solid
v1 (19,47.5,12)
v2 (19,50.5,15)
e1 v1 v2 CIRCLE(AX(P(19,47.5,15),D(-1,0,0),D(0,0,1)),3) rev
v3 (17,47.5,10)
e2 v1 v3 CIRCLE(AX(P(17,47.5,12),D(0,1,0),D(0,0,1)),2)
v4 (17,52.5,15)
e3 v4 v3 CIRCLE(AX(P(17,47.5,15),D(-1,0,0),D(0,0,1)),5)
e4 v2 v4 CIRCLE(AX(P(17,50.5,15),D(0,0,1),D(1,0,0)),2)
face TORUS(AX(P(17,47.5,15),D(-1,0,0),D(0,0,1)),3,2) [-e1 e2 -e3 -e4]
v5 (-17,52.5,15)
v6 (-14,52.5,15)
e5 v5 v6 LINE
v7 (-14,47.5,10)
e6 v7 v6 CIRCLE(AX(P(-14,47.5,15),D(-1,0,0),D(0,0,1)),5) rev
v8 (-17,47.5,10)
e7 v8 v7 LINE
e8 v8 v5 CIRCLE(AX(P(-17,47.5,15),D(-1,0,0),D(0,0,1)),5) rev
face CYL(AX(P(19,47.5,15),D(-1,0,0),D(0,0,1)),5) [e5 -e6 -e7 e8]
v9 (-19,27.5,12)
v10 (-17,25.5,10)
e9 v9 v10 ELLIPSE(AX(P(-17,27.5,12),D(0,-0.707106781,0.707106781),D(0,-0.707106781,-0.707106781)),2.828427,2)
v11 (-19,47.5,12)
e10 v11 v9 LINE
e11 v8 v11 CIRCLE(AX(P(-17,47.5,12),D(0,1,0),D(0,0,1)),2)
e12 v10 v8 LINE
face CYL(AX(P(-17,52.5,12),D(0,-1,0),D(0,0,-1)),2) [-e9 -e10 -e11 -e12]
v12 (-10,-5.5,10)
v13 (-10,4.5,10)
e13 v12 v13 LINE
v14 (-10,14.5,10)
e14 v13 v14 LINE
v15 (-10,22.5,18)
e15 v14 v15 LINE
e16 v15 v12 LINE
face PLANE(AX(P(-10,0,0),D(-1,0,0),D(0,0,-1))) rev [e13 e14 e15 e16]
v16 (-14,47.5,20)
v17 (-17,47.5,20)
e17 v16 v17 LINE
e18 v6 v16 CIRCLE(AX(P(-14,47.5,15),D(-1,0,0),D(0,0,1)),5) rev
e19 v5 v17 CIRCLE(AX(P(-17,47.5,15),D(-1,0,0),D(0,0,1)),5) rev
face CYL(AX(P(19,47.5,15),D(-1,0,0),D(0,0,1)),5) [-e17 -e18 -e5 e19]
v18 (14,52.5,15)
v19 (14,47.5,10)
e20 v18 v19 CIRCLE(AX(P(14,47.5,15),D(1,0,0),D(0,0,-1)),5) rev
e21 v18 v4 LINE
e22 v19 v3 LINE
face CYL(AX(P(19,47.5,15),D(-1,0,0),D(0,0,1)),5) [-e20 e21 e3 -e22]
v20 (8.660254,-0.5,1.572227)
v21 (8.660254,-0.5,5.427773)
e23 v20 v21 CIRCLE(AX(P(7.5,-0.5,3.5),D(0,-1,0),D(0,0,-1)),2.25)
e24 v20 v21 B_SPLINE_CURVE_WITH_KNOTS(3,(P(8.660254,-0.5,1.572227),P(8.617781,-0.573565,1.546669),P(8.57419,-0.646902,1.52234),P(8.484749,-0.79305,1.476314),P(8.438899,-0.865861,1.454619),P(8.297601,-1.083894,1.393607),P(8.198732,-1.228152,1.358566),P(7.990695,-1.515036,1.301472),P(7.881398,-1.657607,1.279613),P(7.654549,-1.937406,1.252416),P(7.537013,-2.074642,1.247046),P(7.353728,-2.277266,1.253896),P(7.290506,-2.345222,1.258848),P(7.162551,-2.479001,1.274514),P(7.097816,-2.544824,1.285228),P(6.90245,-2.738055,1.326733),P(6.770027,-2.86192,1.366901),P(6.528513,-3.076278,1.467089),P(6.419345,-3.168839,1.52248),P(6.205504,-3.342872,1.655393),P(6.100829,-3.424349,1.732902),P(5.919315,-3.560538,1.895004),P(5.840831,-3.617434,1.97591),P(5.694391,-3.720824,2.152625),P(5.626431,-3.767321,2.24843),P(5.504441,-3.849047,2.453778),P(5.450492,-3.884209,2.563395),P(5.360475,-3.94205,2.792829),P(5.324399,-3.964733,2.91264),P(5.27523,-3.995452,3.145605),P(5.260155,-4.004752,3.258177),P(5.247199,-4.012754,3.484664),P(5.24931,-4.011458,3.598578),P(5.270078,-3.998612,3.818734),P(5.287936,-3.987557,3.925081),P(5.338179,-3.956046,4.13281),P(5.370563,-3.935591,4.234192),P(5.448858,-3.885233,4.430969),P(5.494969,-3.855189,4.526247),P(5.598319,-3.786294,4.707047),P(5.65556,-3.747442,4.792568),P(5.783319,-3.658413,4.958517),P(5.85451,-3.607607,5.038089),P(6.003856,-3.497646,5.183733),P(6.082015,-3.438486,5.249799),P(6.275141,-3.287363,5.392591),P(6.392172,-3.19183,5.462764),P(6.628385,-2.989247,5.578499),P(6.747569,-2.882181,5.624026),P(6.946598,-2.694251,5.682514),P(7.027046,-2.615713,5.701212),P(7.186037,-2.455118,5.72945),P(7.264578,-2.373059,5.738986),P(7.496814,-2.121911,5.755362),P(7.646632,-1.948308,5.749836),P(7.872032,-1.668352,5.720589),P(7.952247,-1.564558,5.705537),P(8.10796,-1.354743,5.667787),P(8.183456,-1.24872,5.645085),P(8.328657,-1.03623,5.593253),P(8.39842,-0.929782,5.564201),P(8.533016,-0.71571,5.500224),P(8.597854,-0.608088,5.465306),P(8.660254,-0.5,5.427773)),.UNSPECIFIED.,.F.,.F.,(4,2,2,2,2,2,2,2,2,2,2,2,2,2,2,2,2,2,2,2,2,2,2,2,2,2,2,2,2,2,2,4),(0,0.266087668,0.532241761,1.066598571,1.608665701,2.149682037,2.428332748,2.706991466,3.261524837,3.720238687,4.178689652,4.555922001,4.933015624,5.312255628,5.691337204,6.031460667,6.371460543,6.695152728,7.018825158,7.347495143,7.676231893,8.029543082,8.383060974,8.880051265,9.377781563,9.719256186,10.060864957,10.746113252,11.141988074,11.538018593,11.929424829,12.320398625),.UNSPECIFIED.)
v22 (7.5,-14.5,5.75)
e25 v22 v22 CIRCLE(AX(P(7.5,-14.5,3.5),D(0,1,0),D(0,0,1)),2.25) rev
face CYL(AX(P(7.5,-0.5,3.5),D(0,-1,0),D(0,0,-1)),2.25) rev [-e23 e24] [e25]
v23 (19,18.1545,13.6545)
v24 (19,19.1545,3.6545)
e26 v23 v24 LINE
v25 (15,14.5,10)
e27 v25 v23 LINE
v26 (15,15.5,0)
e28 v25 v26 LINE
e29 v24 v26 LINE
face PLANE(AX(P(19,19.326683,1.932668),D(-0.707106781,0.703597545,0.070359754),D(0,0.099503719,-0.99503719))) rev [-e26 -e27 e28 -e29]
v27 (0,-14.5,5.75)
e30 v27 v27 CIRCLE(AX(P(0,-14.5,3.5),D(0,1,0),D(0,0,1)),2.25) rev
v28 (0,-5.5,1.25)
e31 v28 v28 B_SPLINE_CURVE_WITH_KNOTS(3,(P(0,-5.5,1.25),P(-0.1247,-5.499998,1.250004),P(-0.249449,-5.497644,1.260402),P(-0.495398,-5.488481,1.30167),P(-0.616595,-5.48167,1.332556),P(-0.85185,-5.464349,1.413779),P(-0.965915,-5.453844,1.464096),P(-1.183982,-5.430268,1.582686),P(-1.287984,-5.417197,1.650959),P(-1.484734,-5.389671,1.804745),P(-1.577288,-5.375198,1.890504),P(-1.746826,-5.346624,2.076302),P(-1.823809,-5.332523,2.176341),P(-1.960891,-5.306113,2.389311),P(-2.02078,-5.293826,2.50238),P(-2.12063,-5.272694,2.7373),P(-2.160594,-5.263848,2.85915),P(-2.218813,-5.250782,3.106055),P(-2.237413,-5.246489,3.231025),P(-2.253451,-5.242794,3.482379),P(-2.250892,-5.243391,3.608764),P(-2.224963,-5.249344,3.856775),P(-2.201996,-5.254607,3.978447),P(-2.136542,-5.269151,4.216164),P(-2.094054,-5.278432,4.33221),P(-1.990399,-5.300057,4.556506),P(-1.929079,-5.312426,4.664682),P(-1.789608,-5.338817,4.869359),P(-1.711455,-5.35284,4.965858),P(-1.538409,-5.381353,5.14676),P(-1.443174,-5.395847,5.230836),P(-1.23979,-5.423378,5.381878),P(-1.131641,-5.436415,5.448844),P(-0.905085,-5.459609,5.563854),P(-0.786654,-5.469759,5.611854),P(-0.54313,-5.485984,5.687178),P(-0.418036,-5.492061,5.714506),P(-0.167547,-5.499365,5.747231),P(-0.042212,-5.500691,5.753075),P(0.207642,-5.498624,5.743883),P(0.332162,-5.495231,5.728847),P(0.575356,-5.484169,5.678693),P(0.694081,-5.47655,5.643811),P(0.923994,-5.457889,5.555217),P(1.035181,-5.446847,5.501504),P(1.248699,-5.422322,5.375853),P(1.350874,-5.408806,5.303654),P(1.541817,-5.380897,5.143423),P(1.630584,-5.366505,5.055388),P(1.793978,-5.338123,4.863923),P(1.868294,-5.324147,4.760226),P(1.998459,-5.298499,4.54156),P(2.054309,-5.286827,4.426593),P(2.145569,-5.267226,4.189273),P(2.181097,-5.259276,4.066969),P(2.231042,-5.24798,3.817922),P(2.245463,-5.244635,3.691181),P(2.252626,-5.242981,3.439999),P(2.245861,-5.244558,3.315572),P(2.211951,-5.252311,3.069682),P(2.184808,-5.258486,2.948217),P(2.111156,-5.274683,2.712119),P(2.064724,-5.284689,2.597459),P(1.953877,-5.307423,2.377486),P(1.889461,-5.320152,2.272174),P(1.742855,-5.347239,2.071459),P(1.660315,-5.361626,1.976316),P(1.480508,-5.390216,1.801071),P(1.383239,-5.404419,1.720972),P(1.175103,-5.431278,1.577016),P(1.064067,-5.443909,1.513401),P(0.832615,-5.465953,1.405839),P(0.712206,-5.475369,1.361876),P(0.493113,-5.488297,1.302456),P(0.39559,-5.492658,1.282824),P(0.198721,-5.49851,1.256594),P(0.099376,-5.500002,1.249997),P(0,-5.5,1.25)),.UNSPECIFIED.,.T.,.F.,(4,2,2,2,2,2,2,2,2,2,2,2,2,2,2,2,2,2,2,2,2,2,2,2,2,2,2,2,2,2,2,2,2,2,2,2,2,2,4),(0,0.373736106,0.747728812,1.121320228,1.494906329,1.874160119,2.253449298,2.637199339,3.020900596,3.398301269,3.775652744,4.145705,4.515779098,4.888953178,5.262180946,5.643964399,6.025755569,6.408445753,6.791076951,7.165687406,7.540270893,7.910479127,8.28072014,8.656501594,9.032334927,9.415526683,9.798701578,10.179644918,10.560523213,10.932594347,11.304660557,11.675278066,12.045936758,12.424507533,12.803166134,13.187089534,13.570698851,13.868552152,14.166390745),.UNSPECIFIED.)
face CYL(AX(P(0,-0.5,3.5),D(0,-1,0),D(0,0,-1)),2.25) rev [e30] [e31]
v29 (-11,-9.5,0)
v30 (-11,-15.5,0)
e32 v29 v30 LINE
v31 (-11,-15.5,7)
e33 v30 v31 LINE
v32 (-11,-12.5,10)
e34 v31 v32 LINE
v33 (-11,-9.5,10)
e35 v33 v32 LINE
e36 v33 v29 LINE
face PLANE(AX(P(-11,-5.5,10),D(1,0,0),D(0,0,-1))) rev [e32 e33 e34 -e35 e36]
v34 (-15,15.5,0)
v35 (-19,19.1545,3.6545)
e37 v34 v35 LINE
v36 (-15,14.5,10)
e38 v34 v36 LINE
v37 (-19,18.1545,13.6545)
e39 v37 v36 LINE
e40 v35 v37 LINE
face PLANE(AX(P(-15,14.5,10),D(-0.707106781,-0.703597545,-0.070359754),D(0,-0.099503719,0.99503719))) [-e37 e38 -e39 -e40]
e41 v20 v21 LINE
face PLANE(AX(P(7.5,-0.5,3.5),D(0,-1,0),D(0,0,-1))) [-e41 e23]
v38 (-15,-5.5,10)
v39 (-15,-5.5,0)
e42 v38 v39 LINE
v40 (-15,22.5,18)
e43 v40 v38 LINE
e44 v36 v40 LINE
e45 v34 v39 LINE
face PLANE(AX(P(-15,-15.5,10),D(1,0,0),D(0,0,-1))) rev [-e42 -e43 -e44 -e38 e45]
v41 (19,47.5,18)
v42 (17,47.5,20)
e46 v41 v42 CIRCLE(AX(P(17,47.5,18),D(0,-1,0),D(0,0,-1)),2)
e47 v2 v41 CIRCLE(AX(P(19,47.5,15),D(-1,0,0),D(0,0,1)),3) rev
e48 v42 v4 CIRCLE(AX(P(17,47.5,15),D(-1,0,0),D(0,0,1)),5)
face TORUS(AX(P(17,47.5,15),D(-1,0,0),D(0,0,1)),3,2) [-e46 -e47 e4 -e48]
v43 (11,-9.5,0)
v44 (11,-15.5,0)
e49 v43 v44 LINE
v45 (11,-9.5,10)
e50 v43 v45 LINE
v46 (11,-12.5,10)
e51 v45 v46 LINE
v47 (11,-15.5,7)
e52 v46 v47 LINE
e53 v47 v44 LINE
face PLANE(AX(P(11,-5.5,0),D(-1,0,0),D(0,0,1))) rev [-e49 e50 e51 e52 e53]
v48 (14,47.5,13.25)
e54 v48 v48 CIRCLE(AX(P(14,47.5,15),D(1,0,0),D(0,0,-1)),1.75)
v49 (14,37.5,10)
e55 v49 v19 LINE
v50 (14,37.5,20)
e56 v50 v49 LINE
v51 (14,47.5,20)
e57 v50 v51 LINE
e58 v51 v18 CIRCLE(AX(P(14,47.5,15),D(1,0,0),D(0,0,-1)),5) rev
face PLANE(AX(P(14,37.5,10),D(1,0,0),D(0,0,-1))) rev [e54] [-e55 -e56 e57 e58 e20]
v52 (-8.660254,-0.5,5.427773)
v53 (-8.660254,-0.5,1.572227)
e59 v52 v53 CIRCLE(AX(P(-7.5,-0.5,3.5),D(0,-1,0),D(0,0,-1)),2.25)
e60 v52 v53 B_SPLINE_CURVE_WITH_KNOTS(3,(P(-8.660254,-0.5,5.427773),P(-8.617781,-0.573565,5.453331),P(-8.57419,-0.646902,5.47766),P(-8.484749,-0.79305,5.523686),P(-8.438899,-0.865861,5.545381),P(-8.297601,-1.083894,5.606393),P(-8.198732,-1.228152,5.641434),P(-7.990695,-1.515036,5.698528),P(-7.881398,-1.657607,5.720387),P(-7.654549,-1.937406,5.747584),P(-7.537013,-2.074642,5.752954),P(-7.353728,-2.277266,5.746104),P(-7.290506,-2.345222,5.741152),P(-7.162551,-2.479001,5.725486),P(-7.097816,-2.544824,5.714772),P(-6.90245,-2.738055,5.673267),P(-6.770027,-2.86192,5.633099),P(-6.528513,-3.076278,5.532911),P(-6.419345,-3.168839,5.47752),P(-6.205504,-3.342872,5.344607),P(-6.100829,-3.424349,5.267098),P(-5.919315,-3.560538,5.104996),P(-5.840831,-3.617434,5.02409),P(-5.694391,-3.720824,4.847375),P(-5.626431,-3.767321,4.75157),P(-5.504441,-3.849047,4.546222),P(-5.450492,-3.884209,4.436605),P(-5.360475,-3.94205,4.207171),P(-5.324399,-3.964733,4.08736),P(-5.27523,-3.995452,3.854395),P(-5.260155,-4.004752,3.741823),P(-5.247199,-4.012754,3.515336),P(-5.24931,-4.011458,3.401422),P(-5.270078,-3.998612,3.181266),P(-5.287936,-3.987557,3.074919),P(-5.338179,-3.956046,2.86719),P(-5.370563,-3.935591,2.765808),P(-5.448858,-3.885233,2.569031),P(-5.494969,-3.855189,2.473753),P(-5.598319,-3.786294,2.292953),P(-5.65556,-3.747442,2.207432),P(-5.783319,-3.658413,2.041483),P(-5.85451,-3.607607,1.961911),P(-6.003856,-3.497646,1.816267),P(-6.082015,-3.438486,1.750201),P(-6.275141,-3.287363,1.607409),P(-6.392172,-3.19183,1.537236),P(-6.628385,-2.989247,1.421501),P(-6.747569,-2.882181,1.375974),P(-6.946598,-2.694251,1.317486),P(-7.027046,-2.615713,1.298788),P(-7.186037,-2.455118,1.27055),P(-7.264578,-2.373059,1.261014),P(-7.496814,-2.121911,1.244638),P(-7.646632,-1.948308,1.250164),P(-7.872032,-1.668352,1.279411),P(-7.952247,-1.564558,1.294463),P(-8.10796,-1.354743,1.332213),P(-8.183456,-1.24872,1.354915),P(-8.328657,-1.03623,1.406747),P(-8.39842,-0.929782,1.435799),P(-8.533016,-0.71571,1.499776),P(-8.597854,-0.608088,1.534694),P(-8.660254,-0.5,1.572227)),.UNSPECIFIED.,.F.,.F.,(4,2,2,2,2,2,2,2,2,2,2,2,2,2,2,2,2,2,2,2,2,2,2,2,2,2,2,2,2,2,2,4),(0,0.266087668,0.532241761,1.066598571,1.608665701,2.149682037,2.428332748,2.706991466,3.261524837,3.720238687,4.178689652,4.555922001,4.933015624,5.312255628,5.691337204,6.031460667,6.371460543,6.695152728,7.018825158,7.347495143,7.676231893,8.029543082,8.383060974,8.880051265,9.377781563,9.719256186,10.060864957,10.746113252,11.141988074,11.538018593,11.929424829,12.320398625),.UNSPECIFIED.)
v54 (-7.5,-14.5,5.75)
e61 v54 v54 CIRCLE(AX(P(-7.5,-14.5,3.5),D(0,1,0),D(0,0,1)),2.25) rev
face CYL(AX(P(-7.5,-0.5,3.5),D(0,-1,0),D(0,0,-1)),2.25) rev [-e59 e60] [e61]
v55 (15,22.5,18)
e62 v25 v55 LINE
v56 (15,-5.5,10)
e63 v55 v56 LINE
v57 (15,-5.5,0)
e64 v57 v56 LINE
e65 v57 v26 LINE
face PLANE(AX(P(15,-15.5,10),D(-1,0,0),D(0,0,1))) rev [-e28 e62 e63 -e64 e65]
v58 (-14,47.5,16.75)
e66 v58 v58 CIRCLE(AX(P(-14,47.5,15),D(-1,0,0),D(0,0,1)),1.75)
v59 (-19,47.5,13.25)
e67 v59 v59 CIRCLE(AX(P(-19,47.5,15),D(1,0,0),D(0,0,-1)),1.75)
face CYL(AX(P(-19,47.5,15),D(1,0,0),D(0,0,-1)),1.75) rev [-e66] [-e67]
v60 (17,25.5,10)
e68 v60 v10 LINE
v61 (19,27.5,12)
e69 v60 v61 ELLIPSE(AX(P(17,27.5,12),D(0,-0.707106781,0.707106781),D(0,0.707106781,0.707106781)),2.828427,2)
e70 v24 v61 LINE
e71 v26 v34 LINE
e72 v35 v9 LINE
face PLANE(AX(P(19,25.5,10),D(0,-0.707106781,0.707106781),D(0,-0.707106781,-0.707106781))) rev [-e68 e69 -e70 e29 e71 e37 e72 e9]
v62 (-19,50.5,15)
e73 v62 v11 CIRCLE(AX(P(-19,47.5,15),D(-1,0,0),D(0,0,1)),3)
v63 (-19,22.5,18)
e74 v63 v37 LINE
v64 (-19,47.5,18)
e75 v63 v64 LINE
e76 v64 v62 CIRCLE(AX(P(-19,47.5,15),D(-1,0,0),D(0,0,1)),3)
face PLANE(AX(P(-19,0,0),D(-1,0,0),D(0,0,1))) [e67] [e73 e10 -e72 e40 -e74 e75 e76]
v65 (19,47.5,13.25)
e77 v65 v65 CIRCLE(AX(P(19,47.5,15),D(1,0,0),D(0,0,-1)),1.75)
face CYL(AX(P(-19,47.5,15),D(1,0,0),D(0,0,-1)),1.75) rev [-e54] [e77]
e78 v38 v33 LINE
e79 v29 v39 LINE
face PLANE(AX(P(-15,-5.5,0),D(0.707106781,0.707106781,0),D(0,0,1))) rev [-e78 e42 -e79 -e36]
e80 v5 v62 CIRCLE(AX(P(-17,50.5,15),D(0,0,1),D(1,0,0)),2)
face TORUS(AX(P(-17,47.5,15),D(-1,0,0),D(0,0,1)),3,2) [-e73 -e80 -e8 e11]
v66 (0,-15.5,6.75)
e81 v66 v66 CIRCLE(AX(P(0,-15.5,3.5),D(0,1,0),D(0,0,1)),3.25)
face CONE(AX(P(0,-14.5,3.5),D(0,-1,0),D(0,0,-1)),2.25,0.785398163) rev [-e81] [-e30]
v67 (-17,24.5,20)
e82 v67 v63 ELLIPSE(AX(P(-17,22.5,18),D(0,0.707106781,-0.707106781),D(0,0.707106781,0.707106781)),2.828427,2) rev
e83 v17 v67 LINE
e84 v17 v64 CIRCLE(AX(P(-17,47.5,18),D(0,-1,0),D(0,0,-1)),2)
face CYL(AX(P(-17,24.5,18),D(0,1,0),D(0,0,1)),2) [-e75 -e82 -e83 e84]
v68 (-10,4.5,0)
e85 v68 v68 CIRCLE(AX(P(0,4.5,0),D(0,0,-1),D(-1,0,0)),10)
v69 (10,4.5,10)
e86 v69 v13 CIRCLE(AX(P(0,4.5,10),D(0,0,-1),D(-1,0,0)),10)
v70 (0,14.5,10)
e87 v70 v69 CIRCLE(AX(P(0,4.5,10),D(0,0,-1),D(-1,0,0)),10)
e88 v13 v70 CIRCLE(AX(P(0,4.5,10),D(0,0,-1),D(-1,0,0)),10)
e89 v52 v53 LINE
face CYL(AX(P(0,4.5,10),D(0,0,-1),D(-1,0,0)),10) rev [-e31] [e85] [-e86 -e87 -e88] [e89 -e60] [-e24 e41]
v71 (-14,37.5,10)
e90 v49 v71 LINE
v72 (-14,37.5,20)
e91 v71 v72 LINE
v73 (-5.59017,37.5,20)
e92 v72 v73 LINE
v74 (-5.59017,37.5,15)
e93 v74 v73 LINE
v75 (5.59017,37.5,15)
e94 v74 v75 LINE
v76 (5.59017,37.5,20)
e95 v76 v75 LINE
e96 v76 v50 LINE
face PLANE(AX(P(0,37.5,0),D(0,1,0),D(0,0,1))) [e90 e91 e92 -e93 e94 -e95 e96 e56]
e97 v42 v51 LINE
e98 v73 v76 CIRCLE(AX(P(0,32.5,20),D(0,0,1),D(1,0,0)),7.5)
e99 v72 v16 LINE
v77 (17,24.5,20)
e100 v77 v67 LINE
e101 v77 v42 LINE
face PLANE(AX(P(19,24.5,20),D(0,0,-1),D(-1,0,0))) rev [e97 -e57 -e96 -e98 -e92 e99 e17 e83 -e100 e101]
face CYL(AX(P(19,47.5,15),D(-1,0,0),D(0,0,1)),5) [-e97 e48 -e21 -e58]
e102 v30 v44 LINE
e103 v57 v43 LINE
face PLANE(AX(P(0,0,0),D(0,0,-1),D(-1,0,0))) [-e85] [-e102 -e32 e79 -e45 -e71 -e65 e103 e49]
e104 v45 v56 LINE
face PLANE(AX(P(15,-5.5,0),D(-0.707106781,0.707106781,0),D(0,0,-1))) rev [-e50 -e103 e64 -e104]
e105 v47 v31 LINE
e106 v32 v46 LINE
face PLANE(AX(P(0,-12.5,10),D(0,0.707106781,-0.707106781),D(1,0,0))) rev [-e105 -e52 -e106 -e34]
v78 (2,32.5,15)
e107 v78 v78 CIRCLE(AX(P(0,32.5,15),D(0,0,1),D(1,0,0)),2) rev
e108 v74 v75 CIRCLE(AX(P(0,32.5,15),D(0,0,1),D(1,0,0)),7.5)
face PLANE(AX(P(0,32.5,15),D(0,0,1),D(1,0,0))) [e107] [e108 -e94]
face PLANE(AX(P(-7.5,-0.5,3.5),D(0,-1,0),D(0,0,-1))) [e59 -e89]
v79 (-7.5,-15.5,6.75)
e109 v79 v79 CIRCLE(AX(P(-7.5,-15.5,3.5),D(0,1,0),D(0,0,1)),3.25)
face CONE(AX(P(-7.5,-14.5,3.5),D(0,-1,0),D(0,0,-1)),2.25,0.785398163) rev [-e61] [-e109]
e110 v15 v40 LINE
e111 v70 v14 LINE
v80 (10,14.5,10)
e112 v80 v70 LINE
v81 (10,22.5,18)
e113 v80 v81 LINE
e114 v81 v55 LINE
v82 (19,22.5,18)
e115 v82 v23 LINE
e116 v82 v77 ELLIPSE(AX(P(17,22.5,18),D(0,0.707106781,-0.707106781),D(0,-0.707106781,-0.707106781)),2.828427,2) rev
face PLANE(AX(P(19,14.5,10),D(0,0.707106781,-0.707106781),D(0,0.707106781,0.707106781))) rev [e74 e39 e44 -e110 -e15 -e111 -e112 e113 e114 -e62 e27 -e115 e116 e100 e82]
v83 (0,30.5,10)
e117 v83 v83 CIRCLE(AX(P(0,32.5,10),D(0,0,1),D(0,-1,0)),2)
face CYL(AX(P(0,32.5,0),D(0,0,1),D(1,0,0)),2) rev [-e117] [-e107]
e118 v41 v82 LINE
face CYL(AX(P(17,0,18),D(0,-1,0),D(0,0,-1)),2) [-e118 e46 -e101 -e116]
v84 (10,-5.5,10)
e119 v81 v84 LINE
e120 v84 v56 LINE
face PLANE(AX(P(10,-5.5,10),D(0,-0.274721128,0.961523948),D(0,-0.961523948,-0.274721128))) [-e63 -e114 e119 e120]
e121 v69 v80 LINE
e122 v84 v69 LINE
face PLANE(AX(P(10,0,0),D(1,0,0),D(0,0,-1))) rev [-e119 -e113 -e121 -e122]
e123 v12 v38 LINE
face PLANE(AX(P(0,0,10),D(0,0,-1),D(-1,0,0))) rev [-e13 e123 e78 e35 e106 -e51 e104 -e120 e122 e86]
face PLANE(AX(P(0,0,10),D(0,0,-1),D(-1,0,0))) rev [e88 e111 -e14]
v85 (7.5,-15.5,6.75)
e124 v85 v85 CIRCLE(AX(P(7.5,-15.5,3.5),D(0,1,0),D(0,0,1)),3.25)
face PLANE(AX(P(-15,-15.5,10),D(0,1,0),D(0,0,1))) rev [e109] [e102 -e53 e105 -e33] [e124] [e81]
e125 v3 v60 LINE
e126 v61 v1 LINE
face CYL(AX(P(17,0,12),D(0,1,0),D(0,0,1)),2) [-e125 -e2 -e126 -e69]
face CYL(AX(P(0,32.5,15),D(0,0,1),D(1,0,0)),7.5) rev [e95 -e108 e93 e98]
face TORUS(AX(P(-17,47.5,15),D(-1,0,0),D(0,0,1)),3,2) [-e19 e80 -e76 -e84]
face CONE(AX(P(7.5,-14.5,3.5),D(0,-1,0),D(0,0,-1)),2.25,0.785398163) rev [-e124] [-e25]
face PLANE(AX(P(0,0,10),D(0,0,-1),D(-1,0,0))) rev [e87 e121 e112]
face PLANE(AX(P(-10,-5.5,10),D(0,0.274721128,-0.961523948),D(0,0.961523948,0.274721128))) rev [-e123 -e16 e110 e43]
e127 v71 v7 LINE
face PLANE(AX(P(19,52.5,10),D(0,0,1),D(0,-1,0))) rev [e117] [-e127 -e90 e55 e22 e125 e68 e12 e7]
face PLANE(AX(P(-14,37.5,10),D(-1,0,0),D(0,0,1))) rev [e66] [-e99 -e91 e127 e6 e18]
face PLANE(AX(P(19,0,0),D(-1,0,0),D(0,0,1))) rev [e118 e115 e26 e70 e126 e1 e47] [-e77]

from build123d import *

# Parameters (mm, degrees)
SKETCH1_W           = 30
SKETCH1_H           = 31
BOSS_EXTRUDE1_DEPTH = 10
SKETCH2_W           = 4
SKETCH2_H           = 10
CUT_EXTRUDE1_DEPTH  = 10
CHAMFER1_SIZE       = 4
SKETCH3_R           = 2.25
CUT_EXTRUDE2_DEPTH  = 15
CHAMFER2_SIZE       = 1
SKETCH4_R           = 10
CUT_EXTRUDE3_DEPTH  = 24.774986856
BOSS_EXTRUDE2_DEPTH = 19
CHAMFER3_SIZE       = 4
SKETCH6_W           = 28
SKETCH6_H           = 10
CUT_EXTRUDE4_DEPTH  = 15
FILLET1_R           = 5
SKETCH7_R           = 1.75
CUT_EXTRUDE5_DEPTH  = 68.825142831
FILLET2_R           = 2
SKETCH8_R           = 2
CUT_EXTRUDE6_DEPTH  = 60.306407782
SKETCH9_R           = 7.5
CUT_EXTRUDE7_DEPTH  = 5
BOSS_EXTRUDE3_DEPTH = 5
CHAMFER4_SIZE       = 3


with BuildPart() as part:
    # Sketch1 → Boss-Extrude1 (new body)
    with BuildSketch(Plane.XY):
        Rectangle(SKETCH1_W, SKETCH1_H)
    extrude(amount=BOSS_EXTRUDE1_DEPTH)

    # Sketch2 → Cut-Extrude1 (cut)
    with BuildSketch(Plane.XZ.offset(15.5)):
        with Locations((-13, 5)):
            Rectangle(SKETCH2_W, SKETCH2_H)
        with Locations((13, 5)):
            Rectangle(SKETCH2_W, SKETCH2_H)
    extrude(amount=-CUT_EXTRUDE1_DEPTH, mode=Mode.SUBTRACT)

    # Chamfer1
    chamfer1_edges = [part.edges().sort_by_distance(p)[0] for p in [
        (11, -5.5, 5),
        (-11, -5.5, 5),
    ]]
    chamfer(chamfer1_edges, length=CHAMFER1_SIZE - 0.0001)  # a hair under: the kernel refuses the full size

    # Sketch3 → Cut-Extrude2 (cut)
    with BuildSketch(Plane.XZ.offset(15.5)):
        with Locations(Location((-7.5, 3.5, 0), (0, 0, 270))):
            Circle(SKETCH3_R)
        with Locations(Location((0, 3.5, 0), (0, 0, 270))):
            Circle(SKETCH3_R)
        with Locations(Location((7.5, 3.5, 0), (0, 0, 270))):
            Circle(SKETCH3_R)
    extrude(amount=-CUT_EXTRUDE2_DEPTH, mode=Mode.SUBTRACT)

    # Chamfer2
    chamfer2_edges = [part.edges().sort_by_distance(p)[0] for p in [
        (-7.5, -15.5, 5.75),
        (0, -15.5, 5.75),
        (7.5, -15.5, 5.75),
    ]]
    chamfer(chamfer2_edges, length=CHAMFER2_SIZE)

    # Sketch4 → Cut-Extrude3 (cut, through all)
    with BuildSketch(Plane(origin=(0, 0, 0), x_dir=(-1, 0, 0), z_dir=(0, 0, -1))):
        with Locations((0, 4.5)):
            Circle(SKETCH4_R)
    extrude(amount=-CUT_EXTRUDE3_DEPTH, mode=Mode.SUBTRACT)

    # Sketch5 → Boss-Extrude2 (add, symmetric)
    with BuildSketch(Plane(origin=(0, 0, 0), x_dir=(0, 0, -1), z_dir=(1, 0, 0))):
        Polygon((-10, 14.5), (-20, 24.5), (-20, 52.5), (-10, 52.5), (-10, 25.5), (0, 15.5), align=None)
    extrude(amount=BOSS_EXTRUDE2_DEPTH, both=True)

    # Chamfer3
    chamfer3_edges = [part.edges().sort_by_distance(p)[0] for p in [
        (-19, 15, 5),
        (19, 15, 5),
    ]]
    chamfer(chamfer3_edges, length=CHAMFER3_SIZE - 0.0001)  # a hair under: the kernel refuses the full size

    # Sketch6 → Cut-Extrude4 (cut)
    with BuildSketch(Plane(origin=(0, 52.5, 0), x_dir=(1, 0, 0), z_dir=(0, 1, 0))):
        with Locations((0, -15)):
            Rectangle(SKETCH6_W, SKETCH6_H)
    extrude(amount=-CUT_EXTRUDE4_DEPTH, mode=Mode.SUBTRACT)

    # Fillet1
    fillet1_edges = [part.edges().sort_by_distance(p)[0] for p in [
        (16.5, 52.5, 10),
        (16.5, 52.5, 20),
        (-16.5, 52.5, 10),
        (-16.5, 52.5, 20),
    ]]
    fillet(fillet1_edges, radius=FILLET1_R - 0.0001)  # a hair under: the kernel refuses the full size

    # Sketch7 → Cut-Extrude5 (cut, through all)
    with BuildSketch(Plane(origin=(19, 0, 0), x_dir=(0, 0, -1), z_dir=(1, 0, 0))):
        with Locations((-15, 47.5)):
            Circle(SKETCH7_R)
    extrude(amount=-CUT_EXTRUDE5_DEPTH, mode=Mode.SUBTRACT)

    # Fillet2
    fillet2_edges = [part.edges().sort_by_distance(p)[0] for p in [
        (19, 36.00005, 20),
        (19, 51.035563195, 18.535563195),
        (19, 51.035563195, 11.464436805),
        (-19, 36.00005, 20),
        (-19, 51.035563195, 18.535563195),
        (-19, 51.035563195, 11.464436805),
        (-19, 36.50005, 10),
        (19, 36.50005, 10),
    ]]
    fillet(fillet2_edges, radius=FILLET2_R)

    # Sketch8 → Cut-Extrude6 (cut, through all)
    with BuildSketch(Plane.XY.offset(20)):
        with Locations((0, 32.5)):
            Circle(SKETCH8_R)
    extrude(amount=-CUT_EXTRUDE6_DEPTH, mode=Mode.SUBTRACT)

    # Sketch9 → Cut-Extrude7 (cut)
    with BuildSketch(Plane.XY.offset(20)):
        with Locations((0, 32.5)):
            Circle(SKETCH9_R)
    extrude(amount=-CUT_EXTRUDE7_DEPTH, mode=Mode.SUBTRACT)

    # Sketch10 → Boss-Extrude3 (add)
    with BuildSketch(Plane(origin=(15, 0, 0), x_dir=(0, 0, -1), z_dir=(1, 0, 0))):
        Polygon((-10, -5.5), (-18, 22.5), (-10, 14.5), align=None)
    boss_extrude3 = extrude(amount=-BOSS_EXTRUDE3_DEPTH)

    # Mirror1: Boss-Extrude3 across plane
    add(boss_extrude3.mirror(Plane(origin=(0, 0, 0), x_dir=(0, 0, 1), z_dir=(1, 0, 0))))

    # Chamfer4
    chamfer4_edges = [part.edges().sort_by_distance(p)[0] for p in [
        (0, -15.5, 10),
    ]]
    chamfer(chamfer4_edges, length=CHAMFER4_SIZE)


solid = part.part
